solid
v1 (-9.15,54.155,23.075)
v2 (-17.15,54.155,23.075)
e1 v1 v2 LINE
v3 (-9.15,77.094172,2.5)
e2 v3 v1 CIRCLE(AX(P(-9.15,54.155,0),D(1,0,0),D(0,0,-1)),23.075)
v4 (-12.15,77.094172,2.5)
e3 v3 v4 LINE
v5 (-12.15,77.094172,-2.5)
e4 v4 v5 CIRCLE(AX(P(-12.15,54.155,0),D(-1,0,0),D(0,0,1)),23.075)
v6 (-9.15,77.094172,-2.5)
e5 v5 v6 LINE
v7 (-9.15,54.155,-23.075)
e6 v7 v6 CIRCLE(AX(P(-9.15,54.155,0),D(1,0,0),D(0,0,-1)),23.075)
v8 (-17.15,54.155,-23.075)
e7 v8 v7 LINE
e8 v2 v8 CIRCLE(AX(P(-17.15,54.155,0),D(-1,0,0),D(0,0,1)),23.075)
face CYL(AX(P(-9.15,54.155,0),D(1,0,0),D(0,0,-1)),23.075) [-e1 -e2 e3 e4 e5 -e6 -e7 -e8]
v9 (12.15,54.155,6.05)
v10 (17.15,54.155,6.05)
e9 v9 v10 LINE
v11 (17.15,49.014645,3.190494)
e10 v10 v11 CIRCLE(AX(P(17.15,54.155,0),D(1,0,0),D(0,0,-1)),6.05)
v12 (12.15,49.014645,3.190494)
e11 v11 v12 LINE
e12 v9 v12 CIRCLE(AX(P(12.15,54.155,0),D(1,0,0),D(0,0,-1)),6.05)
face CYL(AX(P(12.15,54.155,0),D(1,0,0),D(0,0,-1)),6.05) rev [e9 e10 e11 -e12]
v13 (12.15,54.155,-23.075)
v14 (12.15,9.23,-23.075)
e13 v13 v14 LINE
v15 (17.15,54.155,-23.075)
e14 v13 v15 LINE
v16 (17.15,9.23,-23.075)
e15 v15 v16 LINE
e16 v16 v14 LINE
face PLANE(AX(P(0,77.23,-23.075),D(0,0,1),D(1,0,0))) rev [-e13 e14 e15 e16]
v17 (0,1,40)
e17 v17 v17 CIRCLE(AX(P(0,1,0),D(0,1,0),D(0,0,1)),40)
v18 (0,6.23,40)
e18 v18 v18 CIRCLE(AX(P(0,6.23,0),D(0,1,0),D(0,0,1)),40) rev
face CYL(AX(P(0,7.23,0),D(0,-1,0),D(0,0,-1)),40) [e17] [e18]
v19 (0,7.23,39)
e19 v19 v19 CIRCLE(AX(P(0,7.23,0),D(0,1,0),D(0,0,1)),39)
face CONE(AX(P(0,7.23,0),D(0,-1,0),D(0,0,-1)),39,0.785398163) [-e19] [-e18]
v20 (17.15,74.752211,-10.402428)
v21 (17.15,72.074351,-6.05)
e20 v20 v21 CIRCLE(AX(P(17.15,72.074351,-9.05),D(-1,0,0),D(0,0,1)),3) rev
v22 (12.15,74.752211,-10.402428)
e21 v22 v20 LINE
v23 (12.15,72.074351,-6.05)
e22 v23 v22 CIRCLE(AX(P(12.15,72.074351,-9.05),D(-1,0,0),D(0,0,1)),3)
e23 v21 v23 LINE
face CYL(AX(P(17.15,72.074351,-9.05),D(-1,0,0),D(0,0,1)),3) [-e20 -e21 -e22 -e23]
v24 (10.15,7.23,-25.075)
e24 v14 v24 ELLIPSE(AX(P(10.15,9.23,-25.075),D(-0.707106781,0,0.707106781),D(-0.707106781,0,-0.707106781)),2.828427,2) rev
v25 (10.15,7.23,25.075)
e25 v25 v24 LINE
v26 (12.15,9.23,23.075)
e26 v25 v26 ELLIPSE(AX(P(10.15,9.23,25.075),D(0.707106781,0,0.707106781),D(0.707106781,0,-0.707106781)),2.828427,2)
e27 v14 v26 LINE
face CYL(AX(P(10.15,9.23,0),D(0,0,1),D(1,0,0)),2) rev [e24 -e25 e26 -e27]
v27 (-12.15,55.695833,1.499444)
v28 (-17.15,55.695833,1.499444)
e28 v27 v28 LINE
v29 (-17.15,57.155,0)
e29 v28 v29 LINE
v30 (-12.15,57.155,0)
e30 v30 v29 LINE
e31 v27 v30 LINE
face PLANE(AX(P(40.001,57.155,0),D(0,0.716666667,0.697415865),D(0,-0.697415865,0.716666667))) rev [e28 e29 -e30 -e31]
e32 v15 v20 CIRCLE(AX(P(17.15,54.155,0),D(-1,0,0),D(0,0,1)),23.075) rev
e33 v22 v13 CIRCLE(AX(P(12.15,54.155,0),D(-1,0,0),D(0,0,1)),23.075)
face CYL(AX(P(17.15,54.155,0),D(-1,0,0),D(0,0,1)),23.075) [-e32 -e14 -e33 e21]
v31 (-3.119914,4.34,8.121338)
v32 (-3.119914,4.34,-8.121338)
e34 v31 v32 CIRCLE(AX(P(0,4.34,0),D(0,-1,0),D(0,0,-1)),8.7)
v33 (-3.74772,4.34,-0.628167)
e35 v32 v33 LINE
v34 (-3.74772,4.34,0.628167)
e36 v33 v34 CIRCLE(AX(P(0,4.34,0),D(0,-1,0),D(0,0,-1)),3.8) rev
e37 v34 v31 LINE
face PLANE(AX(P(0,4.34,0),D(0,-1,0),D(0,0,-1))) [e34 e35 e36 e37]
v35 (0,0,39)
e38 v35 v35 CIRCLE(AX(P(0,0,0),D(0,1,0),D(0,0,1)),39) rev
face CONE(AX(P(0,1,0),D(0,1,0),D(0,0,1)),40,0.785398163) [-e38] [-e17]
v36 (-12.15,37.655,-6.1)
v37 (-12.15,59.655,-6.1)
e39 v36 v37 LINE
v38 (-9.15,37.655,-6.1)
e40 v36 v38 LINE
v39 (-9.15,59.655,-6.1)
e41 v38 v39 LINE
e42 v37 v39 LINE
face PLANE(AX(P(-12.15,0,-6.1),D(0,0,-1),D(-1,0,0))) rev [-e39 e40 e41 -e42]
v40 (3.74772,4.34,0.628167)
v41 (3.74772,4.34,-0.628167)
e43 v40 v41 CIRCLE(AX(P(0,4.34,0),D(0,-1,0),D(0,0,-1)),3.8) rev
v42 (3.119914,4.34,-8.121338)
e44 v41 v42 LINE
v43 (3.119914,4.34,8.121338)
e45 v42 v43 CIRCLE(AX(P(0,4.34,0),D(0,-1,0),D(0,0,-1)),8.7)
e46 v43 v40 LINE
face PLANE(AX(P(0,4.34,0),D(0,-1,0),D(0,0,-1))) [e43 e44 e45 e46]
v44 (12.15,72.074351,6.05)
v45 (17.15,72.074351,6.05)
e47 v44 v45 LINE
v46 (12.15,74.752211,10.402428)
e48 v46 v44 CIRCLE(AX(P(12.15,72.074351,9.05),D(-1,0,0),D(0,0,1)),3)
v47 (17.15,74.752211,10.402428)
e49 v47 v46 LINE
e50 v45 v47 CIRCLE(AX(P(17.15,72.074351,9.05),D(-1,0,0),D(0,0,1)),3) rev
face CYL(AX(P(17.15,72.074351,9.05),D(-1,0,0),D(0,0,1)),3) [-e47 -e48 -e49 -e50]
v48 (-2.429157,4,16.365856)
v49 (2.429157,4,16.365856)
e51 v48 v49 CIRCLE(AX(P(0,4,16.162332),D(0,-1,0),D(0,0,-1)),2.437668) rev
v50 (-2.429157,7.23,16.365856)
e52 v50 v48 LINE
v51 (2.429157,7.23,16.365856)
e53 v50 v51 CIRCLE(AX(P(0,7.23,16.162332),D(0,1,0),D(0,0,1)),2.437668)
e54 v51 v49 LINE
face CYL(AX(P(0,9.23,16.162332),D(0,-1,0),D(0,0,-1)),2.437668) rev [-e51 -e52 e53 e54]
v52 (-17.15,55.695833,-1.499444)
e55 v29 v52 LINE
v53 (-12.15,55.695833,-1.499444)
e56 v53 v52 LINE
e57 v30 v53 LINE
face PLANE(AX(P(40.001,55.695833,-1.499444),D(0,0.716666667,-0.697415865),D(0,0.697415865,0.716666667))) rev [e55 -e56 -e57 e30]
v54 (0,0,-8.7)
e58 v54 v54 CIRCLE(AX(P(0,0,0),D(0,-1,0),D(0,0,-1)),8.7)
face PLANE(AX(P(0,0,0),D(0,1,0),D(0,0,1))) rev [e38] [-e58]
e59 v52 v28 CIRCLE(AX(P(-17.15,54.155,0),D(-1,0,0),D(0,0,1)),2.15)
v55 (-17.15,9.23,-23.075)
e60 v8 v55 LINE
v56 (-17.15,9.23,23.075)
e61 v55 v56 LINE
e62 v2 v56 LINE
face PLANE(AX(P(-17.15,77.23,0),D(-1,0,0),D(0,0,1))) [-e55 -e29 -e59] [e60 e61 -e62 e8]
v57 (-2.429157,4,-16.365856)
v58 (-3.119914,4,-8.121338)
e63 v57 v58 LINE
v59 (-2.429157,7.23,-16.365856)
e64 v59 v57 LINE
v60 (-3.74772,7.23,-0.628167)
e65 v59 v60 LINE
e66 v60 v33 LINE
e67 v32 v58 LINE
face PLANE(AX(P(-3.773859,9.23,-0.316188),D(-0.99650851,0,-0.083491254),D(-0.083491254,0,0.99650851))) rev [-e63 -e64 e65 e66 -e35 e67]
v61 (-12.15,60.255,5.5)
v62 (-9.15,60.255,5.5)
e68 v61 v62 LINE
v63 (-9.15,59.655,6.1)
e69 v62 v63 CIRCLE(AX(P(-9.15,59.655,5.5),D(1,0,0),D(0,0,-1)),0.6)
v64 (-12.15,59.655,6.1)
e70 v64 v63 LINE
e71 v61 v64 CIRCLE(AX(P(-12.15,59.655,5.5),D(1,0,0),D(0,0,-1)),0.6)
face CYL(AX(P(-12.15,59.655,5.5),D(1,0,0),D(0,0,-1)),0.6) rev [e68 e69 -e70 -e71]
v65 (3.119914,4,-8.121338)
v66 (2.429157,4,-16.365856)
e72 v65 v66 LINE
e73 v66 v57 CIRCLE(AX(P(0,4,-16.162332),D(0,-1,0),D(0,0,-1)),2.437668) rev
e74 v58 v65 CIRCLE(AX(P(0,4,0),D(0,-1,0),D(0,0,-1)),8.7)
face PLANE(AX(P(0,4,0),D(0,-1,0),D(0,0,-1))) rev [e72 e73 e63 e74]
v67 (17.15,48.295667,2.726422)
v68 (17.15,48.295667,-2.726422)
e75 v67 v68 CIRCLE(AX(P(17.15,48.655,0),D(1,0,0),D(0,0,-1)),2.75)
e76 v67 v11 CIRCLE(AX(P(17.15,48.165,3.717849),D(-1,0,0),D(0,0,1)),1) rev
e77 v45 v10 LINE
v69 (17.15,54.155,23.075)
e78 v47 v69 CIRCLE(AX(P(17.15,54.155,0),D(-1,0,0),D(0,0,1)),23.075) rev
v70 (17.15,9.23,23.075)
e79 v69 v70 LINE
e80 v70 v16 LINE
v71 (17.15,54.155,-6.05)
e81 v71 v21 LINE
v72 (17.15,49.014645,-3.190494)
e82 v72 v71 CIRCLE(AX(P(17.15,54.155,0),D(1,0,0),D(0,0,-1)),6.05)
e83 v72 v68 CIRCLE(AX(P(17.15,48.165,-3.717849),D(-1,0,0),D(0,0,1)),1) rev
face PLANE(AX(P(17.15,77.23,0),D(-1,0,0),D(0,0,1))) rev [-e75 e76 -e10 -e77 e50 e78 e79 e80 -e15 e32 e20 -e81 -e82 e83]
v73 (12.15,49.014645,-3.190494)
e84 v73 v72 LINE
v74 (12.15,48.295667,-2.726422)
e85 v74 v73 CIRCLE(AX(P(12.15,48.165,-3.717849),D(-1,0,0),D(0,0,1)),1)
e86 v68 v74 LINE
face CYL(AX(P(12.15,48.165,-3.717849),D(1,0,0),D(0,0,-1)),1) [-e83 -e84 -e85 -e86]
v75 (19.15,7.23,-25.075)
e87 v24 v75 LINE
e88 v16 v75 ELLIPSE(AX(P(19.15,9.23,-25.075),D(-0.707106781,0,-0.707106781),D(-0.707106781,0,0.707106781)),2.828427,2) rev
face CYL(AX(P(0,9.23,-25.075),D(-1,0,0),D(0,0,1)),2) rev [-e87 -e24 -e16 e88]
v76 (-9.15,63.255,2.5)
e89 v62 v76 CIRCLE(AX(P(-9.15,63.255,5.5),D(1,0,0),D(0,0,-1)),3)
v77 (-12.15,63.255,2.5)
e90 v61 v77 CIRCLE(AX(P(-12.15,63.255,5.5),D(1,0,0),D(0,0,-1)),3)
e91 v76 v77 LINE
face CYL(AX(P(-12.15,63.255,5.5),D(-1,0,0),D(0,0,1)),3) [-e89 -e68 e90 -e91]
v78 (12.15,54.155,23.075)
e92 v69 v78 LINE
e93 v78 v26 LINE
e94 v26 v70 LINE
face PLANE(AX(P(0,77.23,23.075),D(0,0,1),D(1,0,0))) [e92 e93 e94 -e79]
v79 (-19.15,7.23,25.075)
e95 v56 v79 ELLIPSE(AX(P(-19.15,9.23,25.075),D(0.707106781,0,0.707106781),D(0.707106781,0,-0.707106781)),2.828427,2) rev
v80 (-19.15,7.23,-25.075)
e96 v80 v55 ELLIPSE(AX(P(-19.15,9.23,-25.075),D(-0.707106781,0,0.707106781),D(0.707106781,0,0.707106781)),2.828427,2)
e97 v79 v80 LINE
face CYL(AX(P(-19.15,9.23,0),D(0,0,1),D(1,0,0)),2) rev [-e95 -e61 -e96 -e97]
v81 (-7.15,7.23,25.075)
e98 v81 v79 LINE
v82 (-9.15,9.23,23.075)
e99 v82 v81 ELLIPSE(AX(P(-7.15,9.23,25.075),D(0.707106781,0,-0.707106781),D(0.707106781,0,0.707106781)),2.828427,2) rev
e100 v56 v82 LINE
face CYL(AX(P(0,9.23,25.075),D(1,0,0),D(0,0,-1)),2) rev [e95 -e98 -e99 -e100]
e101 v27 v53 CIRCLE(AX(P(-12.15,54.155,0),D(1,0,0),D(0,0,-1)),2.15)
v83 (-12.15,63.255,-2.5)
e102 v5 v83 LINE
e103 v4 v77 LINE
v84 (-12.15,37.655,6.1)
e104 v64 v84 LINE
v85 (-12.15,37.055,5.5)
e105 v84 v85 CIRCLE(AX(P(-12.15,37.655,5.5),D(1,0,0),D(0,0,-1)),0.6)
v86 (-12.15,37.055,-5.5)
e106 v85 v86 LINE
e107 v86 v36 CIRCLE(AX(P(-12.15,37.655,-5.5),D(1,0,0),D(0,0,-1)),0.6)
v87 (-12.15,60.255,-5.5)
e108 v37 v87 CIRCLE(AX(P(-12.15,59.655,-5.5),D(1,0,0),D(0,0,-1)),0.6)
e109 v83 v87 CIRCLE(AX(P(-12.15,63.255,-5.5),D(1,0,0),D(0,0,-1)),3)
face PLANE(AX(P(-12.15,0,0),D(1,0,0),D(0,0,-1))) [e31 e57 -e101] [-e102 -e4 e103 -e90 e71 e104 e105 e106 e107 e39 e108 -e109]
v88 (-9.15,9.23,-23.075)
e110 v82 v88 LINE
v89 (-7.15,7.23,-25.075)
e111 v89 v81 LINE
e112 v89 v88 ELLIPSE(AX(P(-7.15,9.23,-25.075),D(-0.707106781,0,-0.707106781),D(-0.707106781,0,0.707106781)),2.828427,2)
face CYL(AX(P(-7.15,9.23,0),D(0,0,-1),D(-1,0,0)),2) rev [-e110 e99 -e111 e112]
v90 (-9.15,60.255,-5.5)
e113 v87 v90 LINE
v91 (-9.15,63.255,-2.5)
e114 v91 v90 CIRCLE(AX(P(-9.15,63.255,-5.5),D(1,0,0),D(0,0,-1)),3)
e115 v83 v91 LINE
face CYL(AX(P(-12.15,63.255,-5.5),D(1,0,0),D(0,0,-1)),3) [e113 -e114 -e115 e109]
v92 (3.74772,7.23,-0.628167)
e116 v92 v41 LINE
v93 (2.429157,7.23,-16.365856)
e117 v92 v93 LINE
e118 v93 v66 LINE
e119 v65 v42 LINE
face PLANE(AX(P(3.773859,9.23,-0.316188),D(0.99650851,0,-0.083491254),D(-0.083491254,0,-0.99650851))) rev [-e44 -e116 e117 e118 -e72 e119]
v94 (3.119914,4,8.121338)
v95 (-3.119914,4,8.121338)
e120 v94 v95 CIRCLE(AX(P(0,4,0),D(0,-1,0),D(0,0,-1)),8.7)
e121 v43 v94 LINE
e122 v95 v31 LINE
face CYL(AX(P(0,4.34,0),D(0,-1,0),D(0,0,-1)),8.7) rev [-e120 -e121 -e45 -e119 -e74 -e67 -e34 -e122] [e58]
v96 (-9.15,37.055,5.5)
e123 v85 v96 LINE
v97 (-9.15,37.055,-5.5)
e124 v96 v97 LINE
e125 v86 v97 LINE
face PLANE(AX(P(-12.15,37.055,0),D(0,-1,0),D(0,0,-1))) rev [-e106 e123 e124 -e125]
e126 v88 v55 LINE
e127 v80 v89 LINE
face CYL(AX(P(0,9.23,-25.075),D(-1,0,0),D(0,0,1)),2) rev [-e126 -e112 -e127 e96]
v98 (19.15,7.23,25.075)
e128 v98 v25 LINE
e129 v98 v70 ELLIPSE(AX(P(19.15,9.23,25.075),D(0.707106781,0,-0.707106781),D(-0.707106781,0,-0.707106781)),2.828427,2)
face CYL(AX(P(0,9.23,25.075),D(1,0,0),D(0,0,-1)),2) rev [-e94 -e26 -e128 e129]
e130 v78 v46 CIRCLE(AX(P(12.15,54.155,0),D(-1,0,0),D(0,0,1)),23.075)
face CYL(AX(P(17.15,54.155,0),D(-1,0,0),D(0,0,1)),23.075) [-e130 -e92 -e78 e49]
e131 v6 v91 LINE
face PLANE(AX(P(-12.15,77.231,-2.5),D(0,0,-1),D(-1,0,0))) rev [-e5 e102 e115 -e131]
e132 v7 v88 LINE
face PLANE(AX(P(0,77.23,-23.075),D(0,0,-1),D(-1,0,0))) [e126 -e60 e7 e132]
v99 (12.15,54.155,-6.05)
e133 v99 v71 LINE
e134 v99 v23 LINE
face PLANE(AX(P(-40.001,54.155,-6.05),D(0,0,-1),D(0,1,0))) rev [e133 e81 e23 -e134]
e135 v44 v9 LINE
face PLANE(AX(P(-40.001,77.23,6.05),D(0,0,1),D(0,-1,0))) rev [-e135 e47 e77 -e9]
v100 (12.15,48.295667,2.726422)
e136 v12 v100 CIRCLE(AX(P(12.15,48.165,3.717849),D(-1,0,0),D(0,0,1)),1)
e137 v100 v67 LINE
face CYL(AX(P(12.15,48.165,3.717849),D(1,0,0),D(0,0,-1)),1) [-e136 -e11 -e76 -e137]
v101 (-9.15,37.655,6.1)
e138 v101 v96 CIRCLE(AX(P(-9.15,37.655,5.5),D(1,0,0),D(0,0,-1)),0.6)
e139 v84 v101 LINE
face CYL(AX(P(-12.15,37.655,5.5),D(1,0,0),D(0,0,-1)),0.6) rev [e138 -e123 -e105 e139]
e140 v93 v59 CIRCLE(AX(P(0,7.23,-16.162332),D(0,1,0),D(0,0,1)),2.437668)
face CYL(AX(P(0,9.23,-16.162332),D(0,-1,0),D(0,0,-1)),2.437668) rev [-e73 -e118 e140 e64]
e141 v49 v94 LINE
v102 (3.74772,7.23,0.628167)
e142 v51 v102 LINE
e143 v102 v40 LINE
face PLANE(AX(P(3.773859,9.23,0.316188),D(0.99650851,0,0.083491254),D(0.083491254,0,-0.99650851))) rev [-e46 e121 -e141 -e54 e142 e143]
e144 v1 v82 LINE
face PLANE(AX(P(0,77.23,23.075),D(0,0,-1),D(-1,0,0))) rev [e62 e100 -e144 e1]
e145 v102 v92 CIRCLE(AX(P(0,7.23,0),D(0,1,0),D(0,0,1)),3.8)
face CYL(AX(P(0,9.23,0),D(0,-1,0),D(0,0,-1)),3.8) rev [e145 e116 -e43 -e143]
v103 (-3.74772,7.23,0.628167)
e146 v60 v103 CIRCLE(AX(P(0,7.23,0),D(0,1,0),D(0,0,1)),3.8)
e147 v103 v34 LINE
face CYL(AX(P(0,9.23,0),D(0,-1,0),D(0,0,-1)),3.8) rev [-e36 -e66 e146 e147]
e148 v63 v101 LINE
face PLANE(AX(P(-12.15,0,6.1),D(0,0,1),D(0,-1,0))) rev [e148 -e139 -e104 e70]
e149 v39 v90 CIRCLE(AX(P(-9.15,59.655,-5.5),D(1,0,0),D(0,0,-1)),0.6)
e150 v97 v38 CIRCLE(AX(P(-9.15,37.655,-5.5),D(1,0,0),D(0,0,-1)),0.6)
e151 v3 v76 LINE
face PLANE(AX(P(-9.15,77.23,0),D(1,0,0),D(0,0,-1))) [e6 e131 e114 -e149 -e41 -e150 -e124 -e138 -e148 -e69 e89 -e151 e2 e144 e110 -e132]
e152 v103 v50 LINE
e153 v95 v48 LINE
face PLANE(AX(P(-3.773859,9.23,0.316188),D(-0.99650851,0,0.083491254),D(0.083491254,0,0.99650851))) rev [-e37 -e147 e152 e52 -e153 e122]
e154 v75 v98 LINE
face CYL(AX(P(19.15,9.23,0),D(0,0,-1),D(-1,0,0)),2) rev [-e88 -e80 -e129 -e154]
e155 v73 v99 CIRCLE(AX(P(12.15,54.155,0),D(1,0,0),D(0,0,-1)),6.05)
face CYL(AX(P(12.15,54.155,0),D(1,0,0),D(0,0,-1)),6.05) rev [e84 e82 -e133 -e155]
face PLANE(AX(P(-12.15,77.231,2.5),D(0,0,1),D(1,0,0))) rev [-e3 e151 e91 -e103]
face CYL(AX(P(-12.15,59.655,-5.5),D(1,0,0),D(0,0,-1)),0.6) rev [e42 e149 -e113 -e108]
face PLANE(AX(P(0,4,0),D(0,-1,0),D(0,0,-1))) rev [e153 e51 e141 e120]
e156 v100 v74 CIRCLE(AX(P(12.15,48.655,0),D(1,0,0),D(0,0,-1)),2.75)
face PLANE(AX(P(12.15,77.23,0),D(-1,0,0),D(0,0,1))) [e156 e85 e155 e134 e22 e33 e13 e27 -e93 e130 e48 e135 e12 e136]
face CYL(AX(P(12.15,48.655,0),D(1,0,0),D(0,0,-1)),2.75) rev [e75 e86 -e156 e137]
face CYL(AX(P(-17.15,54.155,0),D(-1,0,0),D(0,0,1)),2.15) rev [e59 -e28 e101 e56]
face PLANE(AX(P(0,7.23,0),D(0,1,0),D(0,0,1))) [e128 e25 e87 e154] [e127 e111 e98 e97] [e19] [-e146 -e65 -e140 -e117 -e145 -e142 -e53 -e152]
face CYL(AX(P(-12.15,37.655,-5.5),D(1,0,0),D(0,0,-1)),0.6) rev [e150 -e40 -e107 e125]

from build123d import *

# Parameters (mm, degrees)
SKETCH4_R                       = 40
BOSS_EXTRUDE2_DEPTH             = 7.23
SKETCH8_W                       = 3
SKETCH8_H                       = 46.15
SKETCH8_W_2                     = 5
BOSS_EXTRUDE3_DEPTH             = 70
FILLET2_RADIUS                  = 23.075
FILLET2_LENGTH                  = 8
FILLET3_RADIUS                  = 23.075
FILLET3_LENGTH                  = 5
FILLET4_R                       = 2
CUT_EXTRUDE3_DEPTH              = 5
FILLET6_R                       = 1
CUT_EXTRUDE4_DEPTH              = 3
F_4_0_START                     = -17.15
F_4_0_MM_DOWEL_HOLES1_OUTLINE_R = 2.15
F_4_0_MM_DOWEL_HOLES1_DEPTH     = 5
CUT_EXTRUDE5_DEPTH              = 37.055
SKETCH19_R                      = 8.7
CUT_EXTRUDE8_DEPTH              = 4.34
CHAMFER1_SIZE                   = 1
CUT_EXTRUDE9_REACH              = 106.07
SKETCH20_W                      = 12.1
SKETCH20_H                      = 23.075
CUT_EXTRUDE10_REACH             = 106.07
CUT_EXTRUDE11_START             = 60.255
SKETCH22_W                      = 3
SKETCH22_H                      = 5
CUT_EXTRUDE11_DEPTH             = 16.975
FILLET9_R                       = 3
FILLET10_R                      = 3
FILLET8_R                       = 3
BOSS_EXTRUDE4_DEPTH             = 4


# Read off the part's stored shape, not the designer's step: Ø4.0 mm Dowel Holes1
with BuildPart() as part:
    # Sketch4 → Boss-Extrude2 (new body)
    with BuildSketch(Plane(origin=(0, 0, 0), x_dir=(1, 0, 0), z_dir=(0, 1, 0))):
        with Locations(Location((0, 0, 0), (0, 0, 270))):
            Circle(SKETCH4_R)
    extrude(amount=BOSS_EXTRUDE2_DEPTH)

    # Sketch8 → Boss-Extrude3 (add)
    with BuildSketch(Plane(origin=(0, 7.23, 0), x_dir=(1, 0, 0), z_dir=(0, 1, 0))):
        with Locations((-10.65, 0)):
            Rectangle(SKETCH8_W, SKETCH8_H)
        with Locations((-14.65, 0)):
            Rectangle(SKETCH8_W_2, SKETCH8_H)
        with Locations((14.65, 0)):
            Rectangle(SKETCH8_W_2, SKETCH8_H)
    extrude(amount=BOSS_EXTRUDE3_DEPTH)

    # Fillet2: full round fillet: the end face becomes a half cylinder, R = half its width
    fillet2_face = Plane((-13.15, 77.23, 0), x_dir=(-1, 0, 0), z_dir=(0, 1, 0))  # on the end face: x along it, z out of the body
    fillet2_slab = fillet2_face.offset(-FILLET2_RADIUS / 2) * Box(FILLET2_LENGTH, 2 * FILLET2_RADIUS, FILLET2_RADIUS, mode=Mode.PRIVATE)  # the body's end, R deep
    fillet2_round = Plane((-13.15, 54.155, 0), x_dir=(0, 1, 0), z_dir=(-1, 0, 0)) * Cylinder(FILLET2_RADIUS, FILLET2_LENGTH, mode=Mode.PRIVATE)  # its axis R under the face
    add(fillet2_slab - fillet2_round, mode=Mode.SUBTRACT)

    # Fillet3: full round fillet: the end face becomes a half cylinder, R = half its width
    fillet3_face = Plane((14.65, 77.23, 0), x_dir=(1, 0, 0), z_dir=(0, 1, 0))  # on the end face: x along it, z out of the body
    fillet3_slab = fillet3_face.offset(-FILLET3_RADIUS / 2) * Box(FILLET3_LENGTH, 2 * FILLET3_RADIUS, FILLET3_RADIUS, mode=Mode.PRIVATE)  # the body's end, R deep
    fillet3_round = Plane((14.65, 54.155, 0), x_dir=(0, 1, 0), z_dir=(1, 0, 0)) * Cylinder(FILLET3_RADIUS, FILLET3_LENGTH, mode=Mode.PRIVATE)  # its axis R under the face
    add(fillet3_slab - fillet3_round, mode=Mode.SUBTRACT)

    # Fillet4
    fillet4_edges = [part.edges().sort_by_distance(p)[0] for p in [
        (-9.15, 7.23, 0),
        (-17.15, 7.23, 0),
        (-13.15, 7.23, -23.075),
        (17.15, 7.23, 0),
        (14.65, 7.23, -23.075),
        (12.15, 7.23, 0),
        (14.65, 7.23, 23.075),
        (-13.15, 7.23, 23.075),
    ]]
    fillet(fillet4_edges, radius=FILLET4_R)

    # Sketch10 → Cut-Extrude3 (cut)
    with BuildSketch(Plane(origin=(17.15, 0, 0), x_dir=(0, 0, -1), z_dir=(1, 0, 0))):
        with BuildLine():
            ThreePointArc((-2.747799119, 48.765), (-1.983053202, 46.749744112), (0, 45.905))
            Line((0, 45.905), (0, 48.105))
            ThreePointArc((0, 48.105), (-1.412975584, 48.272313539), (-2.747799119, 48.765))
        make_face()
        with BuildLine():
            Line((0, 48.105), (0, 45.905))
            ThreePointArc((0, 45.905), (1.944543648, 46.710456352), (2.75, 48.655))
            ThreePointArc((2.75, 48.655), (2.749449725, 48.710011008), (2.747799119, 48.765))
            ThreePointArc((2.747799119, 48.765), (1.412975584, 48.272313539), (0, 48.105))
        make_face()
        with BuildLine():
            ThreePointArc((-2.747799119, 48.765), (-1.412975584, 48.272313539), (0, 48.105))
            Line((0, 48.105), (0, 51.405))
            ThreePointArc((0, 51.405), (-1.905255888, 50.638053202), (-2.747799119, 48.765))
        make_face()
        with BuildLine():
            Line((0, 51.405), (0, 48.105))
            ThreePointArc((0, 48.105), (1.412975584, 48.272313539), (2.747799119, 48.765))
            ThreePointArc((2.747799119, 48.765), (1.905255888, 50.638053202), (0, 51.405))
        make_face()
        with BuildLine():
            ThreePointArc((0, 60.205), (-5.882686461, 55.567975584), (-2.747799119, 48.765))
            ThreePointArc((-2.747799119, 48.765), (-1.905255888, 50.638053202), (0, 51.405))
            Line((0, 51.405), (0, 60.205))
        make_face()
        with BuildLine():
            Line((0, 60.205), (0, 51.405))
            ThreePointArc((0, 51.405), (1.905255888, 50.638053202), (2.747799119, 48.765))
            ThreePointArc((2.747799119, 48.765), (5.158812105, 50.994437129), (6.05, 54.155))
            ThreePointArc((6.05, 54.155), (4.277996026, 58.432996026), (0, 60.205))
        make_face()
    extrude(amount=-CUT_EXTRUDE3_DEPTH, mode=Mode.SUBTRACT)

    # Fillet6
    fillet6_edges = [part.edges().sort_by_distance(p)[0] for p in [
        (14.65, 48.765, -2.747799119),
        (14.65, 48.765, 2.747799119),
    ]]
    fillet(fillet6_edges, radius=FILLET6_R)

    # Sketch11 → Cut-Extrude4 (cut)
    # profile 1 of 2: a face of its own
    with BuildSketch(Plane(origin=(-9.15, 0, 0), x_dir=(0, 0, -1), z_dir=(1, 0, 0))):
        with BuildLine():
            Line((6.1, 54.155), (6.1, 59.655))
            ThreePointArc((6.1, 59.655), (5.924264069, 60.079264069), (5.5, 60.255))
            Line((5.5, 60.255), (0, 60.255))
            Line((0, 60.255), (-5.5, 60.255))
            ThreePointArc((-5.5, 60.255), (-5.924264069, 60.079264069), (-6.1, 59.655))
            Line((-6.1, 59.655), (-6.1, 54.155))
            Line((-6.1, 54.155), (-6.1, 37.655))
            ThreePointArc((-6.1, 37.655), (-5.924264069, 37.230735931), (-5.5, 37.055))
            Line((-5.5, 37.055), (5.5, 37.055))
            ThreePointArc((5.5, 37.055), (5.924264069, 37.230735931), (6.1, 37.655))
            Line((6.1, 37.655), (6.1, 54.155))
        make_face()
        with BuildLine():
            ThreePointArc((-5.5, 60.155), (-5.853553391, 60.008553391), (-6, 59.655))
            Line((-6, 59.655), (-6, 54.155))
            Line((-6, 54.155), (-6, 37.655))
            ThreePointArc((-6, 37.655), (-5.853553391, 37.301446609), (-5.5, 37.155))
            Line((-5.5, 37.155), (5.5, 37.155))
            ThreePointArc((5.5, 37.155), (5.853553391, 37.301446609), (6, 37.655))
            Line((6, 37.655), (6, 54.155))
            Line((6, 54.155), (6, 59.655))
            ThreePointArc((6, 59.655), (5.853553391, 60.008553391), (5.5, 60.155))
            Line((5.5, 60.155), (0, 60.155))
            Line((0, 60.155), (-5.5, 60.155))
        make_face(mode=Mode.SUBTRACT)
    # profile 2 of 2: a face of its own
    with BuildSketch(Plane(origin=(-9.15, 0, 0), x_dir=(0, 0, -1), z_dir=(1, 0, 0))):
        with BuildLine():
            Line((0, 60.155), (-5.5, 60.155))
            ThreePointArc((-5.5, 60.155), (-5.853553391, 60.008553391), (-6, 59.655))
            Line((-6, 59.655), (-6, 54.155))
            Line((-6, 54.155), (-6, 37.655))
            ThreePointArc((-6, 37.655), (-5.853553391, 37.301446609), (-5.5, 37.155))
            Line((-5.5, 37.155), (5.5, 37.155))
            ThreePointArc((5.5, 37.155), (5.853553391, 37.301446609), (6, 37.655))
            Line((6, 37.655), (6, 54.155))
            Line((6, 54.155), (6, 59.655))
            ThreePointArc((6, 59.655), (5.853553391, 60.008553391), (5.5, 60.155))
            Line((5.5, 60.155), (0, 60.155))
        make_face()
    extrude(amount=-CUT_EXTRUDE4_DEPTH, mode=Mode.SUBTRACT)

    # Ø4.0 mm Dowel Holes1 outline → Ø4.0 mm Dowel Holes1 (cut)
    with BuildSketch(Plane.YZ.offset(F_4_0_START)):
        with Locations((54.155, 0)):
            Circle(F_4_0_MM_DOWEL_HOLES1_OUTLINE_R)
    extrude(amount=F_4_0_MM_DOWEL_HOLES1_DEPTH, mode=Mode.SUBTRACT)

    # Sketch17 → Cut-Extrude5 (cut)
    with BuildSketch(Plane.XZ):
        with BuildLine():
            ThreePointArc((-2.429157046, -16.365855829), (0, -18.6), (2.429157046, -16.365855829))
            Line((2.429157046, -16.365855829), (3.747720192, -0.628166667))
            ThreePointArc((3.747720192, -0.628166667), (3.8, 0), (3.747720192, 0.628166667))
            Line((3.747720192, 0.628166667), (2.429157046, 16.365855829))
            ThreePointArc((2.429157046, 16.365855829), (0, 18.6), (-2.429157046, 16.365855829))
            Line((-2.429157046, 16.365855829), (-3.747720192, 0.628166667))
            ThreePointArc((-3.747720192, 0.628166667), (-3.8, 0), (-3.747720192, -0.628166667))
            Line((-3.747720192, -0.628166667), (-2.429157046, -16.365855829))
        make_face()
    extrude(amount=-CUT_EXTRUDE5_DEPTH, mode=Mode.SUBTRACT)

    # Sketch19 → Cut-Extrude8 (cut)
    with BuildSketch(Plane.XZ):
        Circle(SKETCH19_R)
    extrude(amount=-CUT_EXTRUDE8_DEPTH, mode=Mode.SUBTRACT)

    # Chamfer1
    chamfer1_edges = [part.edges().sort_by_distance(p)[0] for p in [
        (0, 0, -40),
        (0, 7.23, -40),
    ]]
    chamfer(chamfer1_edges, length=CHAMFER1_SIZE)

    # Sketch20 → Cut-Extrude9 (cut, up to next)
    with BuildSketch(Plane(origin=(17.15, 0, 0), x_dir=(0, 0, -1), z_dir=(1, 0, 0)), mode=Mode.PRIVATE) as cut_extrude9_sk1:
        with Locations((0, 65.6925)):
            Rectangle(SKETCH20_W, SKETCH20_H)
    cut_extrude9_tool1 = extrude(cut_extrude9_sk1.sketch, amount=-CUT_EXTRUDE9_REACH, mode=Mode.PRIVATE) & part.part
    add(cut_extrude9_tool1.solids().sort_by_distance((17.15, 65.6925, 0))[0], mode=Mode.SUBTRACT)

    # Sketch21 → Cut-Extrude10 (cut, up to next)
    with BuildSketch(Plane.ZY.offset(17.15), mode=Mode.PRIVATE) as cut_extrude10_sk1:
        Polygon((-1.49944411, 55.695833333), (0, 57.155), (1.49944411, 55.695833333), align=None)
    cut_extrude10_tool1 = extrude(cut_extrude10_sk1.sketch, amount=-CUT_EXTRUDE10_REACH, mode=Mode.PRIVATE) & part.part
    add(cut_extrude10_tool1.solids().sort_by_distance((-17.15, 56.182222, 0))[0], mode=Mode.SUBTRACT)

    # Sketch22 → Cut-Extrude11 (cut)
    with BuildSketch(Plane(origin=(0, 0, 0), x_dir=(1, 0, 0), z_dir=(0, 1, 0)).offset(CUT_EXTRUDE11_START)):
        with Locations((-10.65, 0)):
            Rectangle(SKETCH22_W, SKETCH22_H)
    extrude(amount=CUT_EXTRUDE11_DEPTH, mode=Mode.SUBTRACT)

    # Fillet9
    fillet9_edges = [part.edges().sort_by_distance(p)[0] for p in [
        (-10.65, 60.255, 2.5),
    ]]
    fillet(fillet9_edges, radius=FILLET9_R - 0.0001)  # a hair under: the kernel refuses the full size

    # Fillet10
    fillet10_edges = [part.edges().sort_by_distance(p)[0] for p in [
        (-10.65, 60.255, -2.5),
    ]]
    fillet(fillet10_edges, radius=FILLET10_R - 0.0001)  # a hair under: the kernel refuses the full size

    # Fillet8
    fillet8_edges = [part.edges().sort_by_distance(p)[0] for p in [
        (14.65, 76.422759766, -6.05),
        (14.65, 76.422759766, 6.05),
    ]]
    fillet(fillet8_edges, radius=FILLET8_R)

    # Sketch23 → Boss-Extrude4 (add)
    with BuildSketch(Plane.XZ):
        with BuildLine():
            ThreePointArc((-2.429157046, -16.365855829), (0, -18.6), (2.429157046, -16.365855829))
            Line((2.429157046, -16.365855829), (3.119913913, -8.121338386))
            ThreePointArc((3.119913913, -8.121338386), (0, -8.7), (-3.119913913, -8.121338386))
            Line((-3.119913913, -8.121338386), (-2.429157046, -16.365855829))
        make_face()
        with BuildLine():
            Line((-2.429157046, 16.365855829), (-3.119913913, 8.121338386))
            ThreePointArc((-3.119913913, 8.121338386), (0, 8.7), (3.119913913, 8.121338386))
            Line((3.119913913, 8.121338386), (2.429157046, 16.365855829))
            ThreePointArc((2.429157046, 16.365855829), (0, 18.6), (-2.429157046, 16.365855829))
        make_face()
    extrude(amount=-BOSS_EXTRUDE4_DEPTH)


solid = part.part
